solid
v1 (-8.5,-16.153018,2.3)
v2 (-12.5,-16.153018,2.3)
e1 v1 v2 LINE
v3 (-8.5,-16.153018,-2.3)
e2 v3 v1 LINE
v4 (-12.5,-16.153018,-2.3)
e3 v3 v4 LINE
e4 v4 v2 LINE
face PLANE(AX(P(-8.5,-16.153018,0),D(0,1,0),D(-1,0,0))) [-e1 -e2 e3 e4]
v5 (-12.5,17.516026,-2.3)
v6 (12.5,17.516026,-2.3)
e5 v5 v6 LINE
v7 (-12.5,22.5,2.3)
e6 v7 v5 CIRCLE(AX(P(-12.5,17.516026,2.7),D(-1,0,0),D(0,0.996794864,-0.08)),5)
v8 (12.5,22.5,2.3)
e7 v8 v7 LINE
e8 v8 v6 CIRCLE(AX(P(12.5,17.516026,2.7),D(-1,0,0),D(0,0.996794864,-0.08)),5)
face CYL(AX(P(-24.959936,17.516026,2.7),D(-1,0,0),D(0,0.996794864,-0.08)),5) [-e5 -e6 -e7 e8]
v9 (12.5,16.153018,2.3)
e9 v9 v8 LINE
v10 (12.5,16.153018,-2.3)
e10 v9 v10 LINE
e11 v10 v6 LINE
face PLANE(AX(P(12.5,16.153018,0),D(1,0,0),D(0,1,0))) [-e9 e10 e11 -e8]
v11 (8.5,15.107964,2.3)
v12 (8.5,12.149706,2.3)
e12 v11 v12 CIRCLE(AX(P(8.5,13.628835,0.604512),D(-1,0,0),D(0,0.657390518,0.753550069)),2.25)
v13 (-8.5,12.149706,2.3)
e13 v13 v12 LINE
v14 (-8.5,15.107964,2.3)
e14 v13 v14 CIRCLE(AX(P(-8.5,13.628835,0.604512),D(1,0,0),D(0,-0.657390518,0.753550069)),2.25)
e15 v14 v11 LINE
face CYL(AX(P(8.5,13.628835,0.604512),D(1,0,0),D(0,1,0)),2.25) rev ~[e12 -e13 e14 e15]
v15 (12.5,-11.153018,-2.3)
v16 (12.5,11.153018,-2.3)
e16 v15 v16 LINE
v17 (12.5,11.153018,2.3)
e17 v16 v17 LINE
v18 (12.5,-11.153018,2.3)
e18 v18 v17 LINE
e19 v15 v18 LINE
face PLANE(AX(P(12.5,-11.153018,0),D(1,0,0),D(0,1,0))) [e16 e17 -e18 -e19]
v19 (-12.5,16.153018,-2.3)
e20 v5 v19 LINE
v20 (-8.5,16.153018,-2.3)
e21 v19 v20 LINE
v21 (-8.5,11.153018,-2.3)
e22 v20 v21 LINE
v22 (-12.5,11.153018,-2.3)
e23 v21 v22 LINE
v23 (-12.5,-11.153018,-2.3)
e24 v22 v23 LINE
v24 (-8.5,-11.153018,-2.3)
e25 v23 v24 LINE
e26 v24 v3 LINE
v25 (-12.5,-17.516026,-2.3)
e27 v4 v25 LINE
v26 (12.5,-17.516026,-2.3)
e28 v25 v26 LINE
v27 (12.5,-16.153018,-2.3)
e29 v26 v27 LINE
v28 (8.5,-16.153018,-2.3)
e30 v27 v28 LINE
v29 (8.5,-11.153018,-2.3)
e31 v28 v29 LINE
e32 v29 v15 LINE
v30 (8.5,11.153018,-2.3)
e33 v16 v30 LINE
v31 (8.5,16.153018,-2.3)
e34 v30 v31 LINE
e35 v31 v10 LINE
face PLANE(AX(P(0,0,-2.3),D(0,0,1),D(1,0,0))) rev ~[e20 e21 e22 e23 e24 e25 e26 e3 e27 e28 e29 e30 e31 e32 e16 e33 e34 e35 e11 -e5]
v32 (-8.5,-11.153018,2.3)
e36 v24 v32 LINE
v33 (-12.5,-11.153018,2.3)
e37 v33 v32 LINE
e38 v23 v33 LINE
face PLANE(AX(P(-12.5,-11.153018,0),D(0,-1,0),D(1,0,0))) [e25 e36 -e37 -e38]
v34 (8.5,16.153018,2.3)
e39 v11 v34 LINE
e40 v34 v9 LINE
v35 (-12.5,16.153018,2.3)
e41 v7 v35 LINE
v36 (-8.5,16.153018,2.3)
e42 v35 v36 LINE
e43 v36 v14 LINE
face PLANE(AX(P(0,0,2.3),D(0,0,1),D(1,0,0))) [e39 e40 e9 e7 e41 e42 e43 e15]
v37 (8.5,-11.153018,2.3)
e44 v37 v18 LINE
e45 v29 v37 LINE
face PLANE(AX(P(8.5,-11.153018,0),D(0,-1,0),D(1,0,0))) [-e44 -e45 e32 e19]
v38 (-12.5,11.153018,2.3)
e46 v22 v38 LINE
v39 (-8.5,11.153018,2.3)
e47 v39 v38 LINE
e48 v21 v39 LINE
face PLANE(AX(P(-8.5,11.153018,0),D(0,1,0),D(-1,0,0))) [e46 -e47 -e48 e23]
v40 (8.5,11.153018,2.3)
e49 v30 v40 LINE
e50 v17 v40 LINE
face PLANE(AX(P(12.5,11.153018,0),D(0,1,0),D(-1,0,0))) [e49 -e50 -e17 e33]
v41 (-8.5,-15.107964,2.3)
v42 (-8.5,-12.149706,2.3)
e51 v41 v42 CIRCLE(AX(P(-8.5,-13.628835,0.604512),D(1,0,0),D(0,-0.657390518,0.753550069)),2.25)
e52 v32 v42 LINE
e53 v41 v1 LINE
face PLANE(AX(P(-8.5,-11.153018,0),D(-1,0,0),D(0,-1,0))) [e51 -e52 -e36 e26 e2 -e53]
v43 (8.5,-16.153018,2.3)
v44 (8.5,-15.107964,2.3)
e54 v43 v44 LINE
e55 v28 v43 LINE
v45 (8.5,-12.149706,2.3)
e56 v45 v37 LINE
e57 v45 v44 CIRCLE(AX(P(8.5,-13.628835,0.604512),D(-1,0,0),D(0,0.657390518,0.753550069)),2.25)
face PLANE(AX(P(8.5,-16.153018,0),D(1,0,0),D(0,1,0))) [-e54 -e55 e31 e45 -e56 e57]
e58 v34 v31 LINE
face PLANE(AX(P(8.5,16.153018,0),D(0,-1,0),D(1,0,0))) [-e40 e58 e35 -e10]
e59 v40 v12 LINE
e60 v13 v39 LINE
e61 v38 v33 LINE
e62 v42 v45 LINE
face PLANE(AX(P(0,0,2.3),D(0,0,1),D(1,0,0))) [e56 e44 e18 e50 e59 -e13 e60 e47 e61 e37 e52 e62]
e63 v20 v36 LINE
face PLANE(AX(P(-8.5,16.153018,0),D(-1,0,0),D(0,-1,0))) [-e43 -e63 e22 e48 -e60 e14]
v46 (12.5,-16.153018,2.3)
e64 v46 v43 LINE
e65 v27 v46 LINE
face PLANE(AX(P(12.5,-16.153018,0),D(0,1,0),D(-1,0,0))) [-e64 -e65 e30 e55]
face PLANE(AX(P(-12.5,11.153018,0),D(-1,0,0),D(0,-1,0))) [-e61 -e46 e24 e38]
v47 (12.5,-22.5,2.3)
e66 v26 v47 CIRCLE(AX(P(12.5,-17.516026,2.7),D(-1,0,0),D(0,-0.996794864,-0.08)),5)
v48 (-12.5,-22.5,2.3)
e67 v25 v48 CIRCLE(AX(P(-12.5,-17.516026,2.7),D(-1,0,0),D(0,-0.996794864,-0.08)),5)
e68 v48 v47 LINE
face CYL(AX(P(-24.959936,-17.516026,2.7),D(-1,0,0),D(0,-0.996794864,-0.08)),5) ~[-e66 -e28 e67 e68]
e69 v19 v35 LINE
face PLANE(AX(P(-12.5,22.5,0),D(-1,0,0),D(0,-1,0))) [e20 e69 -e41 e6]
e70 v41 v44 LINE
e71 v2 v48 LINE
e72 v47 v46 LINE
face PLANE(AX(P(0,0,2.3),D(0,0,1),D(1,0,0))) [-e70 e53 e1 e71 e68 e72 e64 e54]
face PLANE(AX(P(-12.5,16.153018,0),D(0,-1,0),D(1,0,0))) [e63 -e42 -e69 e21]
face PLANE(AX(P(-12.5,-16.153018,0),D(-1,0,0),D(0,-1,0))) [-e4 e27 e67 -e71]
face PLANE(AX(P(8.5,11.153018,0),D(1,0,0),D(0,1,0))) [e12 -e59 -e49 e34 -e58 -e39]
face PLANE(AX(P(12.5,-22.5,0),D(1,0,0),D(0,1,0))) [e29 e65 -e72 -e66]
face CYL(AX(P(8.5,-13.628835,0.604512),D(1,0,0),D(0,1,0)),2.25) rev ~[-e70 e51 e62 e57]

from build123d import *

# Parameters (mm, degrees)
F1_DEPTH    = 2.3
F2_R        = 2.25
F3_DEPTH    = 25
F4_T1_DEPTH = 49.9198715888


# Not quite as in the source:
# - a fillet or chamfer that OpenCascade refuses, or shapes differently, is made with other operations: its cross-section is extruded or revolved along the edge and cut away or added


with BuildPart() as f1:
    # F0 (on Top) → F1 (new body, symmetric)
    with BuildSketch(Plane.XY):
        Polygon((12.5, 22.5), (-12.5, 22.5), (-12.5, 16.1530176364), (-8.5, 16.1530176364), (-8.5, 11.1530176364), (-12.5, 11.1530176364), (-12.5, -11.1530176364), (-8.5, -11.1530176364), (-8.5, -16.1530176364), (-12.5, -16.1530176364), (-12.5, -22.5), (12.5, -22.5), (12.5, -16.1530176364), (8.5, -16.1530176364), (8.5, -11.1530176364), (12.5, -11.1530176364), (12.5, 11.1530176364), (8.5, 11.1530176364), (8.5, 16.1530176364), (12.5, 16.1530176364), align=None)
    extrude(amount=F1_DEPTH, both=True)

    # F2 (on face) → F3 (cut)
    with BuildSketch(Plane.YZ.offset(8.5)):
        with Locations((-13.6288348585, 0.6045123446)):
            Circle(F2_R)
        with Locations((13.6288348585, 0.6045123446)):
            Circle(F2_R)
    extrude(amount=-F3_DEPTH, mode=Mode.SUBTRACT)

    # F4: fillet of radius 5 on 2 edges, made by hand

    # F4_s2 → F4_t1 (cut)
    with BuildSketch(Plane.YZ.offset(-24.9599357944)):
        with BuildLine():
            ThreePointArc((-22.5, 2.3), (-20.9071906738, -0.9742346142), (-17.5160256822, -2.3))
            Line((-17.5160256822, -2.3), (-22.5, -2.3))
            Line((-22.5, -2.3), (-22.5, 2.3))
        make_face()
        with BuildLine():
            ThreePointArc((22.5, 2.3), (20.9071906738, -0.9742346142), (17.5160256822, -2.3))
            Line((17.5160256822, -2.3), (22.5, -2.3))
            Line((22.5, -2.3), (22.5, 2.3))
        make_face()
    extrude(amount=F4_T1_DEPTH, mode=Mode.SUBTRACT)


solid = f1.part
